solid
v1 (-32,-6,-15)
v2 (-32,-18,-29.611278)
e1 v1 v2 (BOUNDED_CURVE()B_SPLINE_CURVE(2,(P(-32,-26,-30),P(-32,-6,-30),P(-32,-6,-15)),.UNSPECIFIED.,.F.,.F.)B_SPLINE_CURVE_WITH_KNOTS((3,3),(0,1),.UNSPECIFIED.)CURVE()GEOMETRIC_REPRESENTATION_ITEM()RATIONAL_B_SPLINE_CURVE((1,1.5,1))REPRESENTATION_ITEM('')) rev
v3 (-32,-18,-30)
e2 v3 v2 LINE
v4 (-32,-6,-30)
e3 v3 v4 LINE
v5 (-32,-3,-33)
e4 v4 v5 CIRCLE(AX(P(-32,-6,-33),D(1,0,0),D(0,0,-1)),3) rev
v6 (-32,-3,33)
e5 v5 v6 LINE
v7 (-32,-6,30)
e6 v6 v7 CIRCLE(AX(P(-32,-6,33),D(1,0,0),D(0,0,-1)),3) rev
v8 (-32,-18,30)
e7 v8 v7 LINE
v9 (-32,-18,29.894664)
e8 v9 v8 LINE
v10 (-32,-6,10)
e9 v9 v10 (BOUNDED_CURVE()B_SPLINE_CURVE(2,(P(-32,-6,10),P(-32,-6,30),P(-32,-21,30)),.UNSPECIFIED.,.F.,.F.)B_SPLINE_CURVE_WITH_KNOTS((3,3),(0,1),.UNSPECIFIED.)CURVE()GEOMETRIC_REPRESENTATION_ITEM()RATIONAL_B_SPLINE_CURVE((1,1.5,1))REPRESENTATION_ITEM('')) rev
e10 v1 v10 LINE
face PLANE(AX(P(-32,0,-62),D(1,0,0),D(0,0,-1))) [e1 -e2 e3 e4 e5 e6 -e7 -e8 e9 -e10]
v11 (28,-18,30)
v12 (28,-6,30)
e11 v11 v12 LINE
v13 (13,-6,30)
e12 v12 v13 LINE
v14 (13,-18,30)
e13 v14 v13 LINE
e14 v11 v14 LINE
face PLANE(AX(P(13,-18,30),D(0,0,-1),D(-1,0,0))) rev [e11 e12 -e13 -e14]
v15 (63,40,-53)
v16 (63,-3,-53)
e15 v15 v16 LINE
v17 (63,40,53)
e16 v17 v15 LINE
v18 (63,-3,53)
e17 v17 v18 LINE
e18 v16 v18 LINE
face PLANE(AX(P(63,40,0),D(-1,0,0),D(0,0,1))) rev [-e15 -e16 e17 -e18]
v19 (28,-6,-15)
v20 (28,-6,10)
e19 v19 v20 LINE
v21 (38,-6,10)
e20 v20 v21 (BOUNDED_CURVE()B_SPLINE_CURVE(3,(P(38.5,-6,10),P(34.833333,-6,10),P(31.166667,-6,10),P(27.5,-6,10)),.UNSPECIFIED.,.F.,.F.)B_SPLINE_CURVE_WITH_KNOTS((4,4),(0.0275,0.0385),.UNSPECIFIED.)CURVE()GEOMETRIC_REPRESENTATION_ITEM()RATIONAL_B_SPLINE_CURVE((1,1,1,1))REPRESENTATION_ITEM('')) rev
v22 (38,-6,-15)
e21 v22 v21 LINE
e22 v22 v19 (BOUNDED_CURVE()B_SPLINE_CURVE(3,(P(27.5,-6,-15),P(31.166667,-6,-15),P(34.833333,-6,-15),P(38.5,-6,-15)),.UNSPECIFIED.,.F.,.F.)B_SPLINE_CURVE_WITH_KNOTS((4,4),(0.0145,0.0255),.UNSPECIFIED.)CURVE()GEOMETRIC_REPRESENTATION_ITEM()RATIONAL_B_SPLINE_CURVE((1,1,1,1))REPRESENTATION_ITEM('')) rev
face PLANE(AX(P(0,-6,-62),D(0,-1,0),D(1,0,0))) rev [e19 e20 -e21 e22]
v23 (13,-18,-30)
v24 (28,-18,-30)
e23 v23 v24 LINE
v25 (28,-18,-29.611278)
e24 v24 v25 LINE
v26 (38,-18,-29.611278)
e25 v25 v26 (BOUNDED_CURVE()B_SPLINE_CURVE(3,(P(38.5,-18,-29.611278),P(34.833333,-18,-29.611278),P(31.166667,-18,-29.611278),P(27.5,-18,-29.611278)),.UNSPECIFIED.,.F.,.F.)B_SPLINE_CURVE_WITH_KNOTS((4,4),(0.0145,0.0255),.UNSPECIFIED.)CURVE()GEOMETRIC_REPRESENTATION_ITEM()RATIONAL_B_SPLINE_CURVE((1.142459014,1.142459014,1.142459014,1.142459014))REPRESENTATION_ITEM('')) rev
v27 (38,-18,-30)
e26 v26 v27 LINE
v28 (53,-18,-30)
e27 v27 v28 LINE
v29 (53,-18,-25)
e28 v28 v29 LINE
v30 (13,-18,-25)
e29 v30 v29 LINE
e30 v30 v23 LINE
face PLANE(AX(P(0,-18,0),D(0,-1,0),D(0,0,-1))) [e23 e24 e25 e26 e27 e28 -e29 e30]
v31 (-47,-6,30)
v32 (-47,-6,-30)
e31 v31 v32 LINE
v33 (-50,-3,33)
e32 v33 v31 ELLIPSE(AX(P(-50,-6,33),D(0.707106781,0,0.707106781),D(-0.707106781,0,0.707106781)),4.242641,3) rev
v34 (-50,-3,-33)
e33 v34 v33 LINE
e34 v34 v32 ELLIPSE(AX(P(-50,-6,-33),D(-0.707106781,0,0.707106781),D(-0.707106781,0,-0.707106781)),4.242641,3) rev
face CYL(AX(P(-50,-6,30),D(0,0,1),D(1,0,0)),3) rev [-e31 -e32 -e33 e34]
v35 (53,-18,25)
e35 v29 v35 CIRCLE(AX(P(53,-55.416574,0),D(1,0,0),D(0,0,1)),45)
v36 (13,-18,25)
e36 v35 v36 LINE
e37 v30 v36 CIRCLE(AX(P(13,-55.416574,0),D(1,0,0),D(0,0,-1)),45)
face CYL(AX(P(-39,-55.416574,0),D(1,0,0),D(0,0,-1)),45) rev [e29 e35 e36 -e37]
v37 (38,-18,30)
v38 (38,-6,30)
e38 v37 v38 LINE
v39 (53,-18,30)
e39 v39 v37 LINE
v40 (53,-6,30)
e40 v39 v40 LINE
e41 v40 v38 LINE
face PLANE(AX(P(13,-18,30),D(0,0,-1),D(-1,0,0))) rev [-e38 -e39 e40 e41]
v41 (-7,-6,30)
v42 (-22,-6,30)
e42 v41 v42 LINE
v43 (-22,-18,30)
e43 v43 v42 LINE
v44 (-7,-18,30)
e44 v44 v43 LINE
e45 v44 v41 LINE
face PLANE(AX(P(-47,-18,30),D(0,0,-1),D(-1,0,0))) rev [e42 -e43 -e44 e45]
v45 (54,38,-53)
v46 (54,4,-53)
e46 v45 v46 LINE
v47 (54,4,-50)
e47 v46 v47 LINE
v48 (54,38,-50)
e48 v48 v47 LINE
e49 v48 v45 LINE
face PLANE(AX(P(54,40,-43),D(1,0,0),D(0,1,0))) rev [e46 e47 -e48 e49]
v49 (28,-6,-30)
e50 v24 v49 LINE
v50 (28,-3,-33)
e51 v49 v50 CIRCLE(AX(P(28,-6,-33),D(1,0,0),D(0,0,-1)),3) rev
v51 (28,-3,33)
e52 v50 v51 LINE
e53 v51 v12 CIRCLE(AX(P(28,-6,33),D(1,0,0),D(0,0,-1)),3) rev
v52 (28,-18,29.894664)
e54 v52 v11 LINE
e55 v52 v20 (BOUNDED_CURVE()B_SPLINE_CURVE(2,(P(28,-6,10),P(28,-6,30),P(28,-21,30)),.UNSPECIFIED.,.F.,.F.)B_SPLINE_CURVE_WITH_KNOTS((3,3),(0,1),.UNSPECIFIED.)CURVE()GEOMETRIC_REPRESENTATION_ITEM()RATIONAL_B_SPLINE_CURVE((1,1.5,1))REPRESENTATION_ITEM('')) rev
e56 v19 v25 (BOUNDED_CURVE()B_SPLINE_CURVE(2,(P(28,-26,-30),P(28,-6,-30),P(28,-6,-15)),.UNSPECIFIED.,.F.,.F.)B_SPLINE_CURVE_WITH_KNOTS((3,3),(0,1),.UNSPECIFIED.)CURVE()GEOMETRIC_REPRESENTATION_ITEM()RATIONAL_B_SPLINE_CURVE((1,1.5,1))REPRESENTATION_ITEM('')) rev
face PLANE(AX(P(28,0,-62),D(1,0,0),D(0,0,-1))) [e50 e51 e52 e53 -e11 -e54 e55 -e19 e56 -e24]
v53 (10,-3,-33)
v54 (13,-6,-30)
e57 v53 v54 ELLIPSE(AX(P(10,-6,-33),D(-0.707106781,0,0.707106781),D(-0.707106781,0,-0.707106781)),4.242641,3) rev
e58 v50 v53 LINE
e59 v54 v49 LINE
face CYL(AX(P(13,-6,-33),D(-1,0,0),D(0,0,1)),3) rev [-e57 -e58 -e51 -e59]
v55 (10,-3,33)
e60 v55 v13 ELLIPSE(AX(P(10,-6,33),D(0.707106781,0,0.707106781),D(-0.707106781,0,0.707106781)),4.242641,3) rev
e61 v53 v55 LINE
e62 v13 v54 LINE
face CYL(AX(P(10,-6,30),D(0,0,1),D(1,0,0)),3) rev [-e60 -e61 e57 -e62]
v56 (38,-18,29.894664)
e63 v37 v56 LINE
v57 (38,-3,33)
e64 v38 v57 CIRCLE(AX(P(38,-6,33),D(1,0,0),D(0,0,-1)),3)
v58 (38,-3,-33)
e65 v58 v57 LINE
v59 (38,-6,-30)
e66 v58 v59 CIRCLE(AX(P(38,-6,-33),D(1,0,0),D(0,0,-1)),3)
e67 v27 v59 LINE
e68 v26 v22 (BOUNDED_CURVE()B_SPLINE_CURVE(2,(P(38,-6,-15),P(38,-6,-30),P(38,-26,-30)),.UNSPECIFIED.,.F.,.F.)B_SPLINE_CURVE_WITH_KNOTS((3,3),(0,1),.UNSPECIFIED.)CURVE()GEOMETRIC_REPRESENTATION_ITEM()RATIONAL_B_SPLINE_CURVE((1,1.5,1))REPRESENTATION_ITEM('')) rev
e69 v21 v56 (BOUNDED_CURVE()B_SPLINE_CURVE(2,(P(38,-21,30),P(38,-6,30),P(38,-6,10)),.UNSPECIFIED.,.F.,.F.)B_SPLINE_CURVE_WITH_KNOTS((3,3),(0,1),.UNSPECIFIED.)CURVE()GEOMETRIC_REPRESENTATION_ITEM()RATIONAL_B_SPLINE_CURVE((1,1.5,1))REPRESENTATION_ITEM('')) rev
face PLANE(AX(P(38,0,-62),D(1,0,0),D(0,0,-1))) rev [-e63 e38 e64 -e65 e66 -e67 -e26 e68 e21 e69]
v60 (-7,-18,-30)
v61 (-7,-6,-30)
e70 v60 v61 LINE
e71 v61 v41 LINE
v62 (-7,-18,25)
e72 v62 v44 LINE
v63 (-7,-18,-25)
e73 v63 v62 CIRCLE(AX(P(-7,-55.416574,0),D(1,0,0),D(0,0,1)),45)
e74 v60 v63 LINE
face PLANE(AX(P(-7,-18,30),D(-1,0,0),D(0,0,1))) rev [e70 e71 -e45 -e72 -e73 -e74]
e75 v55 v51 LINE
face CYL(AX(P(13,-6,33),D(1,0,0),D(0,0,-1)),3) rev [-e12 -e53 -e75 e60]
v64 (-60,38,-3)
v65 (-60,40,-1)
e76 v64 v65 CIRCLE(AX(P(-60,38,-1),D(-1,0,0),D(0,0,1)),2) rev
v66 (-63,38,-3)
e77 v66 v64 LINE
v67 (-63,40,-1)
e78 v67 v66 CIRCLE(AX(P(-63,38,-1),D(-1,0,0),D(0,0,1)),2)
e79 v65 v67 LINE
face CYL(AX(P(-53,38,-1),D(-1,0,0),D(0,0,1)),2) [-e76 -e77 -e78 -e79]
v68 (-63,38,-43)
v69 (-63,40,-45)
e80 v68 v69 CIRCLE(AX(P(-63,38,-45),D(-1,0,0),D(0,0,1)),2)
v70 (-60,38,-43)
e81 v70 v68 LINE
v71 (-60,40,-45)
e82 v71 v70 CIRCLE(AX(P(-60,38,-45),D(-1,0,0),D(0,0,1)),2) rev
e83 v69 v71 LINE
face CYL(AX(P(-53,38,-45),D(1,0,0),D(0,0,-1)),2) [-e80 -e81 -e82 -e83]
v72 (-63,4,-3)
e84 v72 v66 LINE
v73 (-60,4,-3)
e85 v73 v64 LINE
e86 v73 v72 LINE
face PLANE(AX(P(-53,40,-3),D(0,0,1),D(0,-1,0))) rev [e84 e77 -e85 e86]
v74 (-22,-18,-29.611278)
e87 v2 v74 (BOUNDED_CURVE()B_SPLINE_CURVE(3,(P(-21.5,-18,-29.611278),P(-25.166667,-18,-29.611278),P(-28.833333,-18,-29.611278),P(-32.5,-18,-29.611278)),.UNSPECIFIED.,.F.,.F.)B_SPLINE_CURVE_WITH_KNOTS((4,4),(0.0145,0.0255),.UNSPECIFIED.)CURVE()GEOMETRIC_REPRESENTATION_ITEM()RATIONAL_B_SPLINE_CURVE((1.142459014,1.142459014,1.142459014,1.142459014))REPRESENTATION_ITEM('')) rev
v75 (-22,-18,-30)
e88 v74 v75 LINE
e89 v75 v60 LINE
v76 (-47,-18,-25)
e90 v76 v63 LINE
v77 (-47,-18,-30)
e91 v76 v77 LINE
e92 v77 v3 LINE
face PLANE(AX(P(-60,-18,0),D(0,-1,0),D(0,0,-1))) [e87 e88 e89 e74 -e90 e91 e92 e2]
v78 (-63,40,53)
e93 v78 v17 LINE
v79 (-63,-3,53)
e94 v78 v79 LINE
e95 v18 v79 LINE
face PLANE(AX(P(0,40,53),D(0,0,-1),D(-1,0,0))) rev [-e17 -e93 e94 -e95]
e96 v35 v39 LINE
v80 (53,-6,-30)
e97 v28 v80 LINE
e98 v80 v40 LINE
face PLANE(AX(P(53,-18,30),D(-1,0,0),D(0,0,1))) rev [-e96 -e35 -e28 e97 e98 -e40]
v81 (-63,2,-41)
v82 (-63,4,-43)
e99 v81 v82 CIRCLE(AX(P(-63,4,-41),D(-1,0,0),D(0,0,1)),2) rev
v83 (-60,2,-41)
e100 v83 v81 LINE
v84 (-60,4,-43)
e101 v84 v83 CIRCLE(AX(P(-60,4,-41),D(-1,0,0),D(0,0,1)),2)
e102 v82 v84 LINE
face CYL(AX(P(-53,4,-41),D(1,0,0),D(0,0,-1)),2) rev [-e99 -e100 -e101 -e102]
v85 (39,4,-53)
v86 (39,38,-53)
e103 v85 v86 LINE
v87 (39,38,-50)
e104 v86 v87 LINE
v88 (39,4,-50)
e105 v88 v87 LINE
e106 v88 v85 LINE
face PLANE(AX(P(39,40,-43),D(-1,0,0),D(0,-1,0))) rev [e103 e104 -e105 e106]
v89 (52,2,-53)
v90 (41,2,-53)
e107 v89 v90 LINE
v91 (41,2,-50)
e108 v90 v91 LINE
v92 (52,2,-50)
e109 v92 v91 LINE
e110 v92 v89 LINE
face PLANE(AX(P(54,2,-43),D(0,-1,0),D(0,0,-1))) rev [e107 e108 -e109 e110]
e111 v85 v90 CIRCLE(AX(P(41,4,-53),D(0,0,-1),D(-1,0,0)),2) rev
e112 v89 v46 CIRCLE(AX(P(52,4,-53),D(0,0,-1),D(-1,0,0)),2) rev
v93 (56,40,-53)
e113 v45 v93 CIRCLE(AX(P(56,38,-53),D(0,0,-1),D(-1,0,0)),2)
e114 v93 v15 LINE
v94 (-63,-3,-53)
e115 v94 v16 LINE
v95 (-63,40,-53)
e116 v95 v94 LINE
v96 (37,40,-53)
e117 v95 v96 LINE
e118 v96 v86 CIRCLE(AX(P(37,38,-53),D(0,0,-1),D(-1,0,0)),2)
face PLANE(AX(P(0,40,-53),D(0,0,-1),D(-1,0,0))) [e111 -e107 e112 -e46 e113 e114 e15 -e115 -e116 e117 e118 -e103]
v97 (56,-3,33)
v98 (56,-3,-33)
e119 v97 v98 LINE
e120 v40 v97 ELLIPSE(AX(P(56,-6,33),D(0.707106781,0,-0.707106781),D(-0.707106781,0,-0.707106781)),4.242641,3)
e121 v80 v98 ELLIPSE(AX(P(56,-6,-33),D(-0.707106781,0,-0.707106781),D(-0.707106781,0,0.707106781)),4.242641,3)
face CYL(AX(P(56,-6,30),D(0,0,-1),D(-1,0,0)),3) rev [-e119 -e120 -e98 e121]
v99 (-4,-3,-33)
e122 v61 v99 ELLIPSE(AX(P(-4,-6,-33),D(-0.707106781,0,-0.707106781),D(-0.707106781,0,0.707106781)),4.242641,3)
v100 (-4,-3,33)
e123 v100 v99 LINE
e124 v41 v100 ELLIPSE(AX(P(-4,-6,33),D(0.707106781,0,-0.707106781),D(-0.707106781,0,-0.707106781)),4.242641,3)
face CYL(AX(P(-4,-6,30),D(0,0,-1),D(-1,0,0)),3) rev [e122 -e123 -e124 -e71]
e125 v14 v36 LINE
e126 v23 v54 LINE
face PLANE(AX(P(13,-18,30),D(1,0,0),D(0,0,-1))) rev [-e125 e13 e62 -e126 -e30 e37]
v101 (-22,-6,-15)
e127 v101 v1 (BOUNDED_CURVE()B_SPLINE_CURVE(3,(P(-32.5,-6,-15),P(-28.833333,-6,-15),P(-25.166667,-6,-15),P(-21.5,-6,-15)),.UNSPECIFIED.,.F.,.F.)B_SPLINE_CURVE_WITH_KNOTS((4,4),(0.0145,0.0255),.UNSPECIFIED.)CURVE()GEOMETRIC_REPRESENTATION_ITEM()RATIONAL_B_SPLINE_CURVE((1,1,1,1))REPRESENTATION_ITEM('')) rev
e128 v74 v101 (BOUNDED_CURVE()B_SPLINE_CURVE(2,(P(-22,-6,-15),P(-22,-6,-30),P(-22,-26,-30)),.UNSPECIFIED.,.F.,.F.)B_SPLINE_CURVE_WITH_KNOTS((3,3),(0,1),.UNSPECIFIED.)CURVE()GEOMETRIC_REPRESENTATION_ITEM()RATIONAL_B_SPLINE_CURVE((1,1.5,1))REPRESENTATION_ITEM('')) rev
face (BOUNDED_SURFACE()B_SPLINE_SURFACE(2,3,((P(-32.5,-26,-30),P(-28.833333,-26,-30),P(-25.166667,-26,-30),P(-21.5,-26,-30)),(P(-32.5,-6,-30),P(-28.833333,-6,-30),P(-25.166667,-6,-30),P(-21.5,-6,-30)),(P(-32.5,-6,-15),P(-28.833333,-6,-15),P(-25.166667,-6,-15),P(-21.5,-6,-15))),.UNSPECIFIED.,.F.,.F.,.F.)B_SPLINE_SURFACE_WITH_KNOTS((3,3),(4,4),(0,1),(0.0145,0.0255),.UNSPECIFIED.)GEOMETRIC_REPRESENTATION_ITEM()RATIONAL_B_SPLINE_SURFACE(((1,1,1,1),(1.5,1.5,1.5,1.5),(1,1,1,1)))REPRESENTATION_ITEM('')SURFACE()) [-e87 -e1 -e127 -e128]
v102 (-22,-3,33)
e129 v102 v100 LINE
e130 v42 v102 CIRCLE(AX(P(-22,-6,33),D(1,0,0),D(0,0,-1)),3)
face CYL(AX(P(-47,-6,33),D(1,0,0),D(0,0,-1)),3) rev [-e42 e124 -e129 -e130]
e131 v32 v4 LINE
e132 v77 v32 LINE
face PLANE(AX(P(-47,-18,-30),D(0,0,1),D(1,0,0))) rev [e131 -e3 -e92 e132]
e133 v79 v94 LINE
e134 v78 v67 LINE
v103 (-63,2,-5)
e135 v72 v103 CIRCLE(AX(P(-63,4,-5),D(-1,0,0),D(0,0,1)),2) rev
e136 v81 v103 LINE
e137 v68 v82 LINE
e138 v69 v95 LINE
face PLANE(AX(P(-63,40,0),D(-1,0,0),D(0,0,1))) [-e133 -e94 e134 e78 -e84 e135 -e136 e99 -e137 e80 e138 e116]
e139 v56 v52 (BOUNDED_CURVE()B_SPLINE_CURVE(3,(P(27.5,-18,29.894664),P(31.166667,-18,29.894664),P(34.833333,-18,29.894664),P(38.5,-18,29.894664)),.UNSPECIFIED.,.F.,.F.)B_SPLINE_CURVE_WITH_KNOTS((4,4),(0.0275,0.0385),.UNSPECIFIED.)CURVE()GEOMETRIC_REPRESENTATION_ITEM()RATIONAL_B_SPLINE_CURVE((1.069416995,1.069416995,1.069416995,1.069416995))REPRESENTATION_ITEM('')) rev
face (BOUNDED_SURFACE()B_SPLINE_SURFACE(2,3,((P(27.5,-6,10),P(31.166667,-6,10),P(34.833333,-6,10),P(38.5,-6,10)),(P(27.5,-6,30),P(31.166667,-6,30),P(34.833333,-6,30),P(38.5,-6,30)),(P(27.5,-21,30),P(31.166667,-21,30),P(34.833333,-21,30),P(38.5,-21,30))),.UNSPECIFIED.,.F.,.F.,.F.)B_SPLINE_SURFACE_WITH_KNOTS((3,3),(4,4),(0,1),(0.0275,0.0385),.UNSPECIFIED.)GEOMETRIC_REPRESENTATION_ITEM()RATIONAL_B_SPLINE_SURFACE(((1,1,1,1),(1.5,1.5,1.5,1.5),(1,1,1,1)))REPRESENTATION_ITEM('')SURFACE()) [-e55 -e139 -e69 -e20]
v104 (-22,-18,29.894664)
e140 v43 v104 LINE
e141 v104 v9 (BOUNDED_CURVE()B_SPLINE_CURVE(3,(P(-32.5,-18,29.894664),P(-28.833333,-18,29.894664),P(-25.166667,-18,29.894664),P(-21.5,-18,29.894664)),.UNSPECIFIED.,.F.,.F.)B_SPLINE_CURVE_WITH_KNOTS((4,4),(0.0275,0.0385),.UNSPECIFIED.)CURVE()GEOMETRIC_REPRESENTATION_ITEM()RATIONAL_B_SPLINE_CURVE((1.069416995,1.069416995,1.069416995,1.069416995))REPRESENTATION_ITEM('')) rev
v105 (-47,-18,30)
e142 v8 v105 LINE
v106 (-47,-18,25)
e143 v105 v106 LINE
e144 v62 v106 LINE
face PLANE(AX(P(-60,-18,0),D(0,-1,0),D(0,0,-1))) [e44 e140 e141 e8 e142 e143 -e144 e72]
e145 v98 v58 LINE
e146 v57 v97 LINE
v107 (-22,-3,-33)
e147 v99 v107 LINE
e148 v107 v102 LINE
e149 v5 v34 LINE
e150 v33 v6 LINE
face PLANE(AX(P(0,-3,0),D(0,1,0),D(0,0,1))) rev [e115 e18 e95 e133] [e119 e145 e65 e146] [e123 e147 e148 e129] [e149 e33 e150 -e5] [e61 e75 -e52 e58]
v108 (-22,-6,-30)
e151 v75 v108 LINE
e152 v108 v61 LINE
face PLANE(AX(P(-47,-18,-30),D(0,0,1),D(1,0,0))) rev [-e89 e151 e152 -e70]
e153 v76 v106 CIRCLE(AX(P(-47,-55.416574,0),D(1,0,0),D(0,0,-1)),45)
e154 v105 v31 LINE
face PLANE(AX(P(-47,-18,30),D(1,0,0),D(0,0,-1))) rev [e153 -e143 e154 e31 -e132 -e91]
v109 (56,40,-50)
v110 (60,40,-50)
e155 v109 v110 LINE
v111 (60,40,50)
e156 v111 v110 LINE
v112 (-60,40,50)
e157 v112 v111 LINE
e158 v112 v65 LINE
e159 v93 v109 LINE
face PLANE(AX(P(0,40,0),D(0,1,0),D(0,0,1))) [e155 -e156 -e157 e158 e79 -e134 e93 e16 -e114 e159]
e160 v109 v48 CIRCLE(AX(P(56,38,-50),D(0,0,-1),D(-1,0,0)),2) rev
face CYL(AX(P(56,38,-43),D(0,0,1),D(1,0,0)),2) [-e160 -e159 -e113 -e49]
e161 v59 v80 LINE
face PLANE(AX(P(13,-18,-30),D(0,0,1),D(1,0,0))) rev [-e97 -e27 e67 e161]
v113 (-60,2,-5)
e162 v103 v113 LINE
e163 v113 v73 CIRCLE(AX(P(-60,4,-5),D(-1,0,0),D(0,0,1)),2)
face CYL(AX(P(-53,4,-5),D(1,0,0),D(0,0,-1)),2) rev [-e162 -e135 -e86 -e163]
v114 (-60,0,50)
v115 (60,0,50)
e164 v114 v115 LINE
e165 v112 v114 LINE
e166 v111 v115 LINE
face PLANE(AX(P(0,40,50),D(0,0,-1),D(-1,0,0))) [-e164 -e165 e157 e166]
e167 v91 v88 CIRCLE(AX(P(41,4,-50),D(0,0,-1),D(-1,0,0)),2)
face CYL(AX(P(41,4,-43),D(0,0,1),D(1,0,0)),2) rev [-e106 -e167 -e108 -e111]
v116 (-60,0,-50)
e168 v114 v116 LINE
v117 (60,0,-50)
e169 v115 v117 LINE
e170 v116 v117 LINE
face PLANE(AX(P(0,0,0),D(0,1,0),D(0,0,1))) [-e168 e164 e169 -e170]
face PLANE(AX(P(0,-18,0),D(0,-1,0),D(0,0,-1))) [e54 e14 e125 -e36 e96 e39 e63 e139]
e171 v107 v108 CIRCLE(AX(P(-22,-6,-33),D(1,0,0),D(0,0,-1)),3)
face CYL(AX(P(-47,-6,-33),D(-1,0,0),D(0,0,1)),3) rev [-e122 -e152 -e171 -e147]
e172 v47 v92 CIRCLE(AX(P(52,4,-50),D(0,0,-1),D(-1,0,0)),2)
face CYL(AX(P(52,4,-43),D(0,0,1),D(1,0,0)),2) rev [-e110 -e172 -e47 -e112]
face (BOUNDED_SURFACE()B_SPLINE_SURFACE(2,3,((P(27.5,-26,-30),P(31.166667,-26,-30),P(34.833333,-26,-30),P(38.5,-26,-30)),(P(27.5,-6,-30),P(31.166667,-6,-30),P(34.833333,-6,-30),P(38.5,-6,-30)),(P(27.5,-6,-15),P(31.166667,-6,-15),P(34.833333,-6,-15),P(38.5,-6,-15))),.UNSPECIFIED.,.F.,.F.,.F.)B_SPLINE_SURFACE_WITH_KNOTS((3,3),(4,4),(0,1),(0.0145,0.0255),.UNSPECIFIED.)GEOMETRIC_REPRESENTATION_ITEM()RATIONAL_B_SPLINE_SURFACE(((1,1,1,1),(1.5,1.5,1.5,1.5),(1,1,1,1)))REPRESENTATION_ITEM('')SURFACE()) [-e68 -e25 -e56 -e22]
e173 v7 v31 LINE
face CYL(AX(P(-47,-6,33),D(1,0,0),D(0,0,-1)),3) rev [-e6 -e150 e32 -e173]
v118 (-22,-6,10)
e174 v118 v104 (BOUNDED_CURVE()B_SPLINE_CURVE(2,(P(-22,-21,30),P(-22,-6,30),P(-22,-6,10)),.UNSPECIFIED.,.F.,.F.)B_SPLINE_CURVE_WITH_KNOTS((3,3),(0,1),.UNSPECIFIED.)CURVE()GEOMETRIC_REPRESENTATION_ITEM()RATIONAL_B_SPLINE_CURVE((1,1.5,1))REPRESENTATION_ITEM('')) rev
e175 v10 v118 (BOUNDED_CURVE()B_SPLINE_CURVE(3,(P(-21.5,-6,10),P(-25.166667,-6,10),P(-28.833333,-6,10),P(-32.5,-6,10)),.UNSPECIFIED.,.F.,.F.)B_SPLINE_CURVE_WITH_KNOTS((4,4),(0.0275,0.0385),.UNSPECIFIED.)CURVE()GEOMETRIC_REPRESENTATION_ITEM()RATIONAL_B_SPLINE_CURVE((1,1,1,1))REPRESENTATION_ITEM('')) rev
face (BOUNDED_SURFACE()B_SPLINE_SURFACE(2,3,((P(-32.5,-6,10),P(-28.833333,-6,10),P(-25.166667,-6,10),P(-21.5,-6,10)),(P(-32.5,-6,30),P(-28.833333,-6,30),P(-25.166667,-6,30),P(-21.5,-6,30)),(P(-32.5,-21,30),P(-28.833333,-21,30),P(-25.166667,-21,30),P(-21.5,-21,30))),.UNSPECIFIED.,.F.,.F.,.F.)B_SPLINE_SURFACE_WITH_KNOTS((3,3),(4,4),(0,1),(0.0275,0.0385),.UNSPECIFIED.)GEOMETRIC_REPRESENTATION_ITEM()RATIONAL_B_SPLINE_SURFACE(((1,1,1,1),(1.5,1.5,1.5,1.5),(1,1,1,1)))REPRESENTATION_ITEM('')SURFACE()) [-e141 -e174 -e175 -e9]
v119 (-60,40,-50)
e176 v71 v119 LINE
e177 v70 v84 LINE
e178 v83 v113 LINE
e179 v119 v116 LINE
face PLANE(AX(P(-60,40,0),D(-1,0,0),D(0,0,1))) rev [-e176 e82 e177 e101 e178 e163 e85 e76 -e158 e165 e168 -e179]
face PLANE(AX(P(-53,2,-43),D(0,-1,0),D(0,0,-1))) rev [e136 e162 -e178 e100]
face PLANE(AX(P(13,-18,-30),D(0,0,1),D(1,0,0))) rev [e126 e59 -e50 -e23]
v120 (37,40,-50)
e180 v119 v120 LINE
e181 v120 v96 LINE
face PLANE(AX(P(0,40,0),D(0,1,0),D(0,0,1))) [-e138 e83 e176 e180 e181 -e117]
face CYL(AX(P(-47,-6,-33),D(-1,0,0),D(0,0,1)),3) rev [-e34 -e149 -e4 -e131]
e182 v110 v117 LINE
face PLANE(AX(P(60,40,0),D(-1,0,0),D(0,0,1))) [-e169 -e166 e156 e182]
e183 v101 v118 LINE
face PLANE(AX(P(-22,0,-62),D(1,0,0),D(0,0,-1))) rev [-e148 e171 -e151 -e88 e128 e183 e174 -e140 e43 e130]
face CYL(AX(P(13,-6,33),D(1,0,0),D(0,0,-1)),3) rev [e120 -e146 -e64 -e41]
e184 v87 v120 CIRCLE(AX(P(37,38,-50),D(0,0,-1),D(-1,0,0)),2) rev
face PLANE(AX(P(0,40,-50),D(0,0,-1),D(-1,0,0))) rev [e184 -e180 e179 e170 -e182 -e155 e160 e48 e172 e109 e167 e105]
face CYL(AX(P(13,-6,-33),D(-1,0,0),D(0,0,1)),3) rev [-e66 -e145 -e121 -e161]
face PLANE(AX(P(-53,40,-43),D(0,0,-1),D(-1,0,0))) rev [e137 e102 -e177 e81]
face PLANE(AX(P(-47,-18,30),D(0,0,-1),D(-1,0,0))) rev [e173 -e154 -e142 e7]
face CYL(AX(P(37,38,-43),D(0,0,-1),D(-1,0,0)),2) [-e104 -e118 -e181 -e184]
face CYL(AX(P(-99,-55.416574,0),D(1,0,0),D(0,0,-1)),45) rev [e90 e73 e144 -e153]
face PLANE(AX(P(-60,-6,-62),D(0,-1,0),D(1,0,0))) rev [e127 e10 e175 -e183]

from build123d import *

# Parameters (mm, degrees)
SKETCH1_W           = 126
SKETCH1_H           = 106
SKETCH1_W_2         = 120
SKETCH1_H_2         = 100
BOSS_EXTRUDE1_DEPTH = 40
SKETCH5_W           = 126
SKETCH5_H           = 106
BOSS_EXTRUDE3_DEPTH = 3
SKETCH6_W           = 40
SKETCH6_H           = 60
BOSS_EXTRUDE4_DEPTH = 15
CUT_EXTRUDE3_DEPTH  = 92
SKETCH9_W           = 5
SKETCH9_H           = 3
CUT_EXTRUDE4_DEPTH  = 92
FILLET2_SIZE        = 15
FILLET2_SIZE_2      = 20
FILLET3_R           = 3
LPATTERN2_START     = -47
LPATTERN2_DEPTH     = 40
LPATTERN2_START_2   = -50
LPATTERN2_2_DEPTH   = 18
LPATTERN2_START_3   = -22
LPATTERN2_3_DEPTH   = 18
LPATTERN2_START_4   = -34
LPATTERN2_4_DEPTH   = 68
SKETCH10_W          = 15
SKETCH10_H          = 38
CUT_EXTRUDE5_DEPTH  = 10
SKETCH11_W          = 40
SKETCH11_H          = 38
CUT_EXTRUDE6_DEPTH  = 10
FILLET4_R           = 2


with BuildPart() as part:
    # Sketch1 → Boss-Extrude1 (new body)
    with BuildSketch(Plane(origin=(0, 0, 0), x_dir=(1, 0, 0), z_dir=(0, 1, 0))):
        Rectangle(SKETCH1_W, SKETCH1_H)
        Rectangle(SKETCH1_W_2, SKETCH1_H_2, mode=Mode.SUBTRACT)
    extrude(amount=BOSS_EXTRUDE1_DEPTH)

    # Sketch5 → Boss-Extrude3 (add)
    with BuildSketch(Plane.XZ):
        Rectangle(SKETCH5_W, SKETCH5_H)
    extrude(amount=BOSS_EXTRUDE3_DEPTH)

    # Sketch6 → Boss-Extrude4 (add)
    with BuildSketch(Plane.XZ.offset(3)):
        with Locations((33, 0)):
            Rectangle(SKETCH6_W, SKETCH6_H)
    extrude(amount=BOSS_EXTRUDE4_DEPTH)

    # Sketch7 → Cut-Extrude3 (cut)
    with BuildSketch(Plane(origin=(53, 0, 0), x_dir=(0, 0, -1), z_dir=(1, 0, 0))):
        with BuildLine():
            Line((-25, -18), (25, -18))
            ThreePointArc((25, -18), (0, -10.416573868), (-25, -18))
        make_face()
    extrude(amount=-CUT_EXTRUDE3_DEPTH, mode=Mode.SUBTRACT)

    # Sketch9 → Cut-Extrude4 (cut)
    with BuildSketch(Plane.XY.offset(30)):
        with Locations((30.5, -4.5)):
            Rectangle(SKETCH9_W, SKETCH9_H)
        with Locations((35.5, -4.5)):
            Rectangle(SKETCH9_W, SKETCH9_H)
    extrude(amount=-CUT_EXTRUDE4_DEPTH, mode=Mode.SUBTRACT)

    # Fillet2
    # a fillet whose section is not a circle: 20, 15 mm, written as the material it takes off along each edge
    with BuildSketch(Plane(origin=(38, -6, -30), x_dir=(0, 0, 1), z_dir=(-1, 0, 0))) as fillet2_piece_1:
        with BuildLine():
            Bezier((FILLET2_SIZE, 0), (0, 0), (0, -FILLET2_SIZE_2), weights=[1, 1.5, 1])
            Line((0, -FILLET2_SIZE_2), (0, 0))
            Line((0, 0), (FILLET2_SIZE, 0))
        make_face()
    extrude(amount=10, mode=Mode.SUBTRACT)
    with BuildSketch(Plane(origin=(28, -6, 30), x_dir=(0, 0, -1), z_dir=(1, 0, 0))) as fillet2_piece_2:
        with BuildLine():
            Bezier((FILLET2_SIZE_2, 0), (0, 0), (0, -FILLET2_SIZE), weights=[1, 1.5, 1])
            Line((0, -FILLET2_SIZE), (0, 0))
            Line((0, 0), (FILLET2_SIZE_2, 0))
        make_face()
    extrude(amount=10, mode=Mode.SUBTRACT)

    # Fillet3
    fillet3_edges = [part.edges().sort_by_distance(p)[0] for p in [
        (53, -3, 0),
        (45.5, -3, 30),
        (13, -3, 0),
        (20.5, -3, -30),
        (45.5, -3, -30),
        (20.5, -3, 30),
    ]]
    fillet(fillet3_edges, radius=FILLET3_R)



with BuildPart() as body_2:
    # LPattern2: read off the stored shape, not the designer's step
    # LPattern2 outline → LPattern2 (new body)
    with BuildSketch(Plane.YZ.offset(LPATTERN2_START)):
        with BuildLine():
            Line((-6, -15), (-6, 10))
            add(Edge.make_bspline(
                [(-6, 10), (-6, 28.973665961), (-18, 29.894663844)],
                knots=[0, 0, 0, 0.924950591, 0.924950591, 0.924950591], degree=2, weights=[1, 1.462475296, 1.069416995]))
            Line((-18, 29.894663844), (-18, 25))
            ThreePointArc((-18, 25), (-10.416573868, 0), (-18, -25))
            Line((-18, -25), (-18, -29.611278447))
            add(Edge.make_bspline(
                [(-18, -29.611278447), (-6, -28.174650985), (-6, -15)],
                knots=[0.172065577, 0.172065577, 0.172065577, 1, 1, 1], degree=2, weights=[1.142459014, 1.413967211, 1]))
        make_face()
    extrude(amount=LPATTERN2_DEPTH)


with BuildPart() as part_1:
    add(part.part)

    add(body_2.part)  # LPattern2 2 merges body 2
    # LPattern2 2 outline → LPattern2 2 (add)
    with BuildSketch(Plane.YZ.offset(LPATTERN2_START_2)):
        with BuildLine():
            ThreePointArc((-3, 33), (-3.878679656, 30.878679656), (-6, 30))
            Line((-6, 30), (-18, 30))
            Line((-18, 30), (-18, 29.894663844))
            add(Edge.make_bspline(
                [(-6, 10), (-6, 28.973665961), (-18, 29.894663844)],
                knots=[0, 0, 0, 0.924950591, 0.924950591, 0.924950591], degree=2, weights=[1, 1.462475296, 1.069416995]))
            Line((-6, 10), (-6, -15))
            add(Edge.make_bspline(
                [(-18, -29.611278447), (-6, -28.174650985), (-6, -15)],
                knots=[0.172065577, 0.172065577, 0.172065577, 1, 1, 1], degree=2, weights=[1.142459014, 1.413967211, 1]))
            Line((-18, -29.611278447), (-18, -30))
            Line((-18, -30), (-6, -30))
            ThreePointArc((-6, -30), (-3.878679656, -30.878679656), (-3, -33))
            Line((-3, -33), (-3, 33))
        make_face()
    extrude(amount=LPATTERN2_2_DEPTH)

    # LPattern2 3 outline → LPattern2 3 (add)
    with BuildSketch(Plane.YZ.offset(LPATTERN2_START_3)):
        with BuildLine():
            ThreePointArc((-3, 33), (-3.878679656, 30.878679656), (-6, 30))
            Line((-6, 30), (-18, 30))
            Line((-18, 30), (-18, 29.894663844))
            add(Edge.make_bspline(
                [(-6, 10), (-6, 28.973665961), (-18, 29.894663844)],
                knots=[0, 0, 0, 0.924950591, 0.924950591, 0.924950591], degree=2, weights=[1, 1.462475296, 1.069416995]))
            Line((-6, 10), (-6, -15))
            add(Edge.make_bspline(
                [(-18, -29.611278447), (-6, -28.174650985), (-6, -15)],
                knots=[0.172065577, 0.172065577, 0.172065577, 1, 1, 1], degree=2, weights=[1.142459014, 1.413967211, 1]))
            Line((-18, -29.611278447), (-18, -30))
            Line((-18, -30), (-6, -30))
            ThreePointArc((-6, -30), (-3.878679656, -30.878679656), (-3, -33))
            Line((-3, -33), (-3, 33))
        make_face()
    extrude(amount=LPATTERN2_3_DEPTH)

    # LPattern2 4 outline → LPattern2 4 (cut)
    with BuildSketch(Plane.XY.offset(LPATTERN2_START_4)):
        with BuildLine():
            Line((-50, -18), (-47, -18))
            Line((-47, -18), (-47, -6))
            ThreePointArc((-47, -6), (-47.878679656, -3.878679656), (-50, -3))
            Line((-50, -3), (-50, -18))
        make_face()
        with BuildLine():
            Line((-4, -18), (-4, -3))
            ThreePointArc((-4, -3), (-6.121320344, -3.878679656), (-7, -6))
            Line((-7, -6), (-7, -18))
            Line((-7, -18), (-4, -18))
        make_face()
    extrude(amount=LPATTERN2_4_DEPTH, mode=Mode.SUBTRACT)

    # Sketch10 → Cut-Extrude5 (cut)
    with BuildSketch(Plane(origin=(0, 0, -53), x_dir=(-1, 0, 0), z_dir=(0, 0, -1))):
        with Locations((-46.5, 21)):
            Rectangle(SKETCH10_W, SKETCH10_H)
    extrude(amount=-CUT_EXTRUDE5_DEPTH, mode=Mode.SUBTRACT)

    # Sketch11 → Cut-Extrude6 (cut)
    with BuildSketch(Plane.ZY.offset(63)):
        with Locations((-23, 21)):
            Rectangle(SKETCH11_W, SKETCH11_H)
    extrude(amount=-CUT_EXTRUDE6_DEPTH, mode=Mode.SUBTRACT)

    # Fillet4
    fillet4_edges = [part_1.edges().sort_by_distance(p)[0] for p in [
        (39, 40, -51.5),
        (54, 40, -51.5),
        (39, 2, -51.5),
        (54, 2, -51.5),
        (-61.5, 40, -3),
        (-61.5, 40, -43),
        (-61.5, 2, -3),
        (-61.5, 2, -43),
    ]]
    fillet(fillet4_edges, radius=FILLET4_R)


solid = part_1.part
